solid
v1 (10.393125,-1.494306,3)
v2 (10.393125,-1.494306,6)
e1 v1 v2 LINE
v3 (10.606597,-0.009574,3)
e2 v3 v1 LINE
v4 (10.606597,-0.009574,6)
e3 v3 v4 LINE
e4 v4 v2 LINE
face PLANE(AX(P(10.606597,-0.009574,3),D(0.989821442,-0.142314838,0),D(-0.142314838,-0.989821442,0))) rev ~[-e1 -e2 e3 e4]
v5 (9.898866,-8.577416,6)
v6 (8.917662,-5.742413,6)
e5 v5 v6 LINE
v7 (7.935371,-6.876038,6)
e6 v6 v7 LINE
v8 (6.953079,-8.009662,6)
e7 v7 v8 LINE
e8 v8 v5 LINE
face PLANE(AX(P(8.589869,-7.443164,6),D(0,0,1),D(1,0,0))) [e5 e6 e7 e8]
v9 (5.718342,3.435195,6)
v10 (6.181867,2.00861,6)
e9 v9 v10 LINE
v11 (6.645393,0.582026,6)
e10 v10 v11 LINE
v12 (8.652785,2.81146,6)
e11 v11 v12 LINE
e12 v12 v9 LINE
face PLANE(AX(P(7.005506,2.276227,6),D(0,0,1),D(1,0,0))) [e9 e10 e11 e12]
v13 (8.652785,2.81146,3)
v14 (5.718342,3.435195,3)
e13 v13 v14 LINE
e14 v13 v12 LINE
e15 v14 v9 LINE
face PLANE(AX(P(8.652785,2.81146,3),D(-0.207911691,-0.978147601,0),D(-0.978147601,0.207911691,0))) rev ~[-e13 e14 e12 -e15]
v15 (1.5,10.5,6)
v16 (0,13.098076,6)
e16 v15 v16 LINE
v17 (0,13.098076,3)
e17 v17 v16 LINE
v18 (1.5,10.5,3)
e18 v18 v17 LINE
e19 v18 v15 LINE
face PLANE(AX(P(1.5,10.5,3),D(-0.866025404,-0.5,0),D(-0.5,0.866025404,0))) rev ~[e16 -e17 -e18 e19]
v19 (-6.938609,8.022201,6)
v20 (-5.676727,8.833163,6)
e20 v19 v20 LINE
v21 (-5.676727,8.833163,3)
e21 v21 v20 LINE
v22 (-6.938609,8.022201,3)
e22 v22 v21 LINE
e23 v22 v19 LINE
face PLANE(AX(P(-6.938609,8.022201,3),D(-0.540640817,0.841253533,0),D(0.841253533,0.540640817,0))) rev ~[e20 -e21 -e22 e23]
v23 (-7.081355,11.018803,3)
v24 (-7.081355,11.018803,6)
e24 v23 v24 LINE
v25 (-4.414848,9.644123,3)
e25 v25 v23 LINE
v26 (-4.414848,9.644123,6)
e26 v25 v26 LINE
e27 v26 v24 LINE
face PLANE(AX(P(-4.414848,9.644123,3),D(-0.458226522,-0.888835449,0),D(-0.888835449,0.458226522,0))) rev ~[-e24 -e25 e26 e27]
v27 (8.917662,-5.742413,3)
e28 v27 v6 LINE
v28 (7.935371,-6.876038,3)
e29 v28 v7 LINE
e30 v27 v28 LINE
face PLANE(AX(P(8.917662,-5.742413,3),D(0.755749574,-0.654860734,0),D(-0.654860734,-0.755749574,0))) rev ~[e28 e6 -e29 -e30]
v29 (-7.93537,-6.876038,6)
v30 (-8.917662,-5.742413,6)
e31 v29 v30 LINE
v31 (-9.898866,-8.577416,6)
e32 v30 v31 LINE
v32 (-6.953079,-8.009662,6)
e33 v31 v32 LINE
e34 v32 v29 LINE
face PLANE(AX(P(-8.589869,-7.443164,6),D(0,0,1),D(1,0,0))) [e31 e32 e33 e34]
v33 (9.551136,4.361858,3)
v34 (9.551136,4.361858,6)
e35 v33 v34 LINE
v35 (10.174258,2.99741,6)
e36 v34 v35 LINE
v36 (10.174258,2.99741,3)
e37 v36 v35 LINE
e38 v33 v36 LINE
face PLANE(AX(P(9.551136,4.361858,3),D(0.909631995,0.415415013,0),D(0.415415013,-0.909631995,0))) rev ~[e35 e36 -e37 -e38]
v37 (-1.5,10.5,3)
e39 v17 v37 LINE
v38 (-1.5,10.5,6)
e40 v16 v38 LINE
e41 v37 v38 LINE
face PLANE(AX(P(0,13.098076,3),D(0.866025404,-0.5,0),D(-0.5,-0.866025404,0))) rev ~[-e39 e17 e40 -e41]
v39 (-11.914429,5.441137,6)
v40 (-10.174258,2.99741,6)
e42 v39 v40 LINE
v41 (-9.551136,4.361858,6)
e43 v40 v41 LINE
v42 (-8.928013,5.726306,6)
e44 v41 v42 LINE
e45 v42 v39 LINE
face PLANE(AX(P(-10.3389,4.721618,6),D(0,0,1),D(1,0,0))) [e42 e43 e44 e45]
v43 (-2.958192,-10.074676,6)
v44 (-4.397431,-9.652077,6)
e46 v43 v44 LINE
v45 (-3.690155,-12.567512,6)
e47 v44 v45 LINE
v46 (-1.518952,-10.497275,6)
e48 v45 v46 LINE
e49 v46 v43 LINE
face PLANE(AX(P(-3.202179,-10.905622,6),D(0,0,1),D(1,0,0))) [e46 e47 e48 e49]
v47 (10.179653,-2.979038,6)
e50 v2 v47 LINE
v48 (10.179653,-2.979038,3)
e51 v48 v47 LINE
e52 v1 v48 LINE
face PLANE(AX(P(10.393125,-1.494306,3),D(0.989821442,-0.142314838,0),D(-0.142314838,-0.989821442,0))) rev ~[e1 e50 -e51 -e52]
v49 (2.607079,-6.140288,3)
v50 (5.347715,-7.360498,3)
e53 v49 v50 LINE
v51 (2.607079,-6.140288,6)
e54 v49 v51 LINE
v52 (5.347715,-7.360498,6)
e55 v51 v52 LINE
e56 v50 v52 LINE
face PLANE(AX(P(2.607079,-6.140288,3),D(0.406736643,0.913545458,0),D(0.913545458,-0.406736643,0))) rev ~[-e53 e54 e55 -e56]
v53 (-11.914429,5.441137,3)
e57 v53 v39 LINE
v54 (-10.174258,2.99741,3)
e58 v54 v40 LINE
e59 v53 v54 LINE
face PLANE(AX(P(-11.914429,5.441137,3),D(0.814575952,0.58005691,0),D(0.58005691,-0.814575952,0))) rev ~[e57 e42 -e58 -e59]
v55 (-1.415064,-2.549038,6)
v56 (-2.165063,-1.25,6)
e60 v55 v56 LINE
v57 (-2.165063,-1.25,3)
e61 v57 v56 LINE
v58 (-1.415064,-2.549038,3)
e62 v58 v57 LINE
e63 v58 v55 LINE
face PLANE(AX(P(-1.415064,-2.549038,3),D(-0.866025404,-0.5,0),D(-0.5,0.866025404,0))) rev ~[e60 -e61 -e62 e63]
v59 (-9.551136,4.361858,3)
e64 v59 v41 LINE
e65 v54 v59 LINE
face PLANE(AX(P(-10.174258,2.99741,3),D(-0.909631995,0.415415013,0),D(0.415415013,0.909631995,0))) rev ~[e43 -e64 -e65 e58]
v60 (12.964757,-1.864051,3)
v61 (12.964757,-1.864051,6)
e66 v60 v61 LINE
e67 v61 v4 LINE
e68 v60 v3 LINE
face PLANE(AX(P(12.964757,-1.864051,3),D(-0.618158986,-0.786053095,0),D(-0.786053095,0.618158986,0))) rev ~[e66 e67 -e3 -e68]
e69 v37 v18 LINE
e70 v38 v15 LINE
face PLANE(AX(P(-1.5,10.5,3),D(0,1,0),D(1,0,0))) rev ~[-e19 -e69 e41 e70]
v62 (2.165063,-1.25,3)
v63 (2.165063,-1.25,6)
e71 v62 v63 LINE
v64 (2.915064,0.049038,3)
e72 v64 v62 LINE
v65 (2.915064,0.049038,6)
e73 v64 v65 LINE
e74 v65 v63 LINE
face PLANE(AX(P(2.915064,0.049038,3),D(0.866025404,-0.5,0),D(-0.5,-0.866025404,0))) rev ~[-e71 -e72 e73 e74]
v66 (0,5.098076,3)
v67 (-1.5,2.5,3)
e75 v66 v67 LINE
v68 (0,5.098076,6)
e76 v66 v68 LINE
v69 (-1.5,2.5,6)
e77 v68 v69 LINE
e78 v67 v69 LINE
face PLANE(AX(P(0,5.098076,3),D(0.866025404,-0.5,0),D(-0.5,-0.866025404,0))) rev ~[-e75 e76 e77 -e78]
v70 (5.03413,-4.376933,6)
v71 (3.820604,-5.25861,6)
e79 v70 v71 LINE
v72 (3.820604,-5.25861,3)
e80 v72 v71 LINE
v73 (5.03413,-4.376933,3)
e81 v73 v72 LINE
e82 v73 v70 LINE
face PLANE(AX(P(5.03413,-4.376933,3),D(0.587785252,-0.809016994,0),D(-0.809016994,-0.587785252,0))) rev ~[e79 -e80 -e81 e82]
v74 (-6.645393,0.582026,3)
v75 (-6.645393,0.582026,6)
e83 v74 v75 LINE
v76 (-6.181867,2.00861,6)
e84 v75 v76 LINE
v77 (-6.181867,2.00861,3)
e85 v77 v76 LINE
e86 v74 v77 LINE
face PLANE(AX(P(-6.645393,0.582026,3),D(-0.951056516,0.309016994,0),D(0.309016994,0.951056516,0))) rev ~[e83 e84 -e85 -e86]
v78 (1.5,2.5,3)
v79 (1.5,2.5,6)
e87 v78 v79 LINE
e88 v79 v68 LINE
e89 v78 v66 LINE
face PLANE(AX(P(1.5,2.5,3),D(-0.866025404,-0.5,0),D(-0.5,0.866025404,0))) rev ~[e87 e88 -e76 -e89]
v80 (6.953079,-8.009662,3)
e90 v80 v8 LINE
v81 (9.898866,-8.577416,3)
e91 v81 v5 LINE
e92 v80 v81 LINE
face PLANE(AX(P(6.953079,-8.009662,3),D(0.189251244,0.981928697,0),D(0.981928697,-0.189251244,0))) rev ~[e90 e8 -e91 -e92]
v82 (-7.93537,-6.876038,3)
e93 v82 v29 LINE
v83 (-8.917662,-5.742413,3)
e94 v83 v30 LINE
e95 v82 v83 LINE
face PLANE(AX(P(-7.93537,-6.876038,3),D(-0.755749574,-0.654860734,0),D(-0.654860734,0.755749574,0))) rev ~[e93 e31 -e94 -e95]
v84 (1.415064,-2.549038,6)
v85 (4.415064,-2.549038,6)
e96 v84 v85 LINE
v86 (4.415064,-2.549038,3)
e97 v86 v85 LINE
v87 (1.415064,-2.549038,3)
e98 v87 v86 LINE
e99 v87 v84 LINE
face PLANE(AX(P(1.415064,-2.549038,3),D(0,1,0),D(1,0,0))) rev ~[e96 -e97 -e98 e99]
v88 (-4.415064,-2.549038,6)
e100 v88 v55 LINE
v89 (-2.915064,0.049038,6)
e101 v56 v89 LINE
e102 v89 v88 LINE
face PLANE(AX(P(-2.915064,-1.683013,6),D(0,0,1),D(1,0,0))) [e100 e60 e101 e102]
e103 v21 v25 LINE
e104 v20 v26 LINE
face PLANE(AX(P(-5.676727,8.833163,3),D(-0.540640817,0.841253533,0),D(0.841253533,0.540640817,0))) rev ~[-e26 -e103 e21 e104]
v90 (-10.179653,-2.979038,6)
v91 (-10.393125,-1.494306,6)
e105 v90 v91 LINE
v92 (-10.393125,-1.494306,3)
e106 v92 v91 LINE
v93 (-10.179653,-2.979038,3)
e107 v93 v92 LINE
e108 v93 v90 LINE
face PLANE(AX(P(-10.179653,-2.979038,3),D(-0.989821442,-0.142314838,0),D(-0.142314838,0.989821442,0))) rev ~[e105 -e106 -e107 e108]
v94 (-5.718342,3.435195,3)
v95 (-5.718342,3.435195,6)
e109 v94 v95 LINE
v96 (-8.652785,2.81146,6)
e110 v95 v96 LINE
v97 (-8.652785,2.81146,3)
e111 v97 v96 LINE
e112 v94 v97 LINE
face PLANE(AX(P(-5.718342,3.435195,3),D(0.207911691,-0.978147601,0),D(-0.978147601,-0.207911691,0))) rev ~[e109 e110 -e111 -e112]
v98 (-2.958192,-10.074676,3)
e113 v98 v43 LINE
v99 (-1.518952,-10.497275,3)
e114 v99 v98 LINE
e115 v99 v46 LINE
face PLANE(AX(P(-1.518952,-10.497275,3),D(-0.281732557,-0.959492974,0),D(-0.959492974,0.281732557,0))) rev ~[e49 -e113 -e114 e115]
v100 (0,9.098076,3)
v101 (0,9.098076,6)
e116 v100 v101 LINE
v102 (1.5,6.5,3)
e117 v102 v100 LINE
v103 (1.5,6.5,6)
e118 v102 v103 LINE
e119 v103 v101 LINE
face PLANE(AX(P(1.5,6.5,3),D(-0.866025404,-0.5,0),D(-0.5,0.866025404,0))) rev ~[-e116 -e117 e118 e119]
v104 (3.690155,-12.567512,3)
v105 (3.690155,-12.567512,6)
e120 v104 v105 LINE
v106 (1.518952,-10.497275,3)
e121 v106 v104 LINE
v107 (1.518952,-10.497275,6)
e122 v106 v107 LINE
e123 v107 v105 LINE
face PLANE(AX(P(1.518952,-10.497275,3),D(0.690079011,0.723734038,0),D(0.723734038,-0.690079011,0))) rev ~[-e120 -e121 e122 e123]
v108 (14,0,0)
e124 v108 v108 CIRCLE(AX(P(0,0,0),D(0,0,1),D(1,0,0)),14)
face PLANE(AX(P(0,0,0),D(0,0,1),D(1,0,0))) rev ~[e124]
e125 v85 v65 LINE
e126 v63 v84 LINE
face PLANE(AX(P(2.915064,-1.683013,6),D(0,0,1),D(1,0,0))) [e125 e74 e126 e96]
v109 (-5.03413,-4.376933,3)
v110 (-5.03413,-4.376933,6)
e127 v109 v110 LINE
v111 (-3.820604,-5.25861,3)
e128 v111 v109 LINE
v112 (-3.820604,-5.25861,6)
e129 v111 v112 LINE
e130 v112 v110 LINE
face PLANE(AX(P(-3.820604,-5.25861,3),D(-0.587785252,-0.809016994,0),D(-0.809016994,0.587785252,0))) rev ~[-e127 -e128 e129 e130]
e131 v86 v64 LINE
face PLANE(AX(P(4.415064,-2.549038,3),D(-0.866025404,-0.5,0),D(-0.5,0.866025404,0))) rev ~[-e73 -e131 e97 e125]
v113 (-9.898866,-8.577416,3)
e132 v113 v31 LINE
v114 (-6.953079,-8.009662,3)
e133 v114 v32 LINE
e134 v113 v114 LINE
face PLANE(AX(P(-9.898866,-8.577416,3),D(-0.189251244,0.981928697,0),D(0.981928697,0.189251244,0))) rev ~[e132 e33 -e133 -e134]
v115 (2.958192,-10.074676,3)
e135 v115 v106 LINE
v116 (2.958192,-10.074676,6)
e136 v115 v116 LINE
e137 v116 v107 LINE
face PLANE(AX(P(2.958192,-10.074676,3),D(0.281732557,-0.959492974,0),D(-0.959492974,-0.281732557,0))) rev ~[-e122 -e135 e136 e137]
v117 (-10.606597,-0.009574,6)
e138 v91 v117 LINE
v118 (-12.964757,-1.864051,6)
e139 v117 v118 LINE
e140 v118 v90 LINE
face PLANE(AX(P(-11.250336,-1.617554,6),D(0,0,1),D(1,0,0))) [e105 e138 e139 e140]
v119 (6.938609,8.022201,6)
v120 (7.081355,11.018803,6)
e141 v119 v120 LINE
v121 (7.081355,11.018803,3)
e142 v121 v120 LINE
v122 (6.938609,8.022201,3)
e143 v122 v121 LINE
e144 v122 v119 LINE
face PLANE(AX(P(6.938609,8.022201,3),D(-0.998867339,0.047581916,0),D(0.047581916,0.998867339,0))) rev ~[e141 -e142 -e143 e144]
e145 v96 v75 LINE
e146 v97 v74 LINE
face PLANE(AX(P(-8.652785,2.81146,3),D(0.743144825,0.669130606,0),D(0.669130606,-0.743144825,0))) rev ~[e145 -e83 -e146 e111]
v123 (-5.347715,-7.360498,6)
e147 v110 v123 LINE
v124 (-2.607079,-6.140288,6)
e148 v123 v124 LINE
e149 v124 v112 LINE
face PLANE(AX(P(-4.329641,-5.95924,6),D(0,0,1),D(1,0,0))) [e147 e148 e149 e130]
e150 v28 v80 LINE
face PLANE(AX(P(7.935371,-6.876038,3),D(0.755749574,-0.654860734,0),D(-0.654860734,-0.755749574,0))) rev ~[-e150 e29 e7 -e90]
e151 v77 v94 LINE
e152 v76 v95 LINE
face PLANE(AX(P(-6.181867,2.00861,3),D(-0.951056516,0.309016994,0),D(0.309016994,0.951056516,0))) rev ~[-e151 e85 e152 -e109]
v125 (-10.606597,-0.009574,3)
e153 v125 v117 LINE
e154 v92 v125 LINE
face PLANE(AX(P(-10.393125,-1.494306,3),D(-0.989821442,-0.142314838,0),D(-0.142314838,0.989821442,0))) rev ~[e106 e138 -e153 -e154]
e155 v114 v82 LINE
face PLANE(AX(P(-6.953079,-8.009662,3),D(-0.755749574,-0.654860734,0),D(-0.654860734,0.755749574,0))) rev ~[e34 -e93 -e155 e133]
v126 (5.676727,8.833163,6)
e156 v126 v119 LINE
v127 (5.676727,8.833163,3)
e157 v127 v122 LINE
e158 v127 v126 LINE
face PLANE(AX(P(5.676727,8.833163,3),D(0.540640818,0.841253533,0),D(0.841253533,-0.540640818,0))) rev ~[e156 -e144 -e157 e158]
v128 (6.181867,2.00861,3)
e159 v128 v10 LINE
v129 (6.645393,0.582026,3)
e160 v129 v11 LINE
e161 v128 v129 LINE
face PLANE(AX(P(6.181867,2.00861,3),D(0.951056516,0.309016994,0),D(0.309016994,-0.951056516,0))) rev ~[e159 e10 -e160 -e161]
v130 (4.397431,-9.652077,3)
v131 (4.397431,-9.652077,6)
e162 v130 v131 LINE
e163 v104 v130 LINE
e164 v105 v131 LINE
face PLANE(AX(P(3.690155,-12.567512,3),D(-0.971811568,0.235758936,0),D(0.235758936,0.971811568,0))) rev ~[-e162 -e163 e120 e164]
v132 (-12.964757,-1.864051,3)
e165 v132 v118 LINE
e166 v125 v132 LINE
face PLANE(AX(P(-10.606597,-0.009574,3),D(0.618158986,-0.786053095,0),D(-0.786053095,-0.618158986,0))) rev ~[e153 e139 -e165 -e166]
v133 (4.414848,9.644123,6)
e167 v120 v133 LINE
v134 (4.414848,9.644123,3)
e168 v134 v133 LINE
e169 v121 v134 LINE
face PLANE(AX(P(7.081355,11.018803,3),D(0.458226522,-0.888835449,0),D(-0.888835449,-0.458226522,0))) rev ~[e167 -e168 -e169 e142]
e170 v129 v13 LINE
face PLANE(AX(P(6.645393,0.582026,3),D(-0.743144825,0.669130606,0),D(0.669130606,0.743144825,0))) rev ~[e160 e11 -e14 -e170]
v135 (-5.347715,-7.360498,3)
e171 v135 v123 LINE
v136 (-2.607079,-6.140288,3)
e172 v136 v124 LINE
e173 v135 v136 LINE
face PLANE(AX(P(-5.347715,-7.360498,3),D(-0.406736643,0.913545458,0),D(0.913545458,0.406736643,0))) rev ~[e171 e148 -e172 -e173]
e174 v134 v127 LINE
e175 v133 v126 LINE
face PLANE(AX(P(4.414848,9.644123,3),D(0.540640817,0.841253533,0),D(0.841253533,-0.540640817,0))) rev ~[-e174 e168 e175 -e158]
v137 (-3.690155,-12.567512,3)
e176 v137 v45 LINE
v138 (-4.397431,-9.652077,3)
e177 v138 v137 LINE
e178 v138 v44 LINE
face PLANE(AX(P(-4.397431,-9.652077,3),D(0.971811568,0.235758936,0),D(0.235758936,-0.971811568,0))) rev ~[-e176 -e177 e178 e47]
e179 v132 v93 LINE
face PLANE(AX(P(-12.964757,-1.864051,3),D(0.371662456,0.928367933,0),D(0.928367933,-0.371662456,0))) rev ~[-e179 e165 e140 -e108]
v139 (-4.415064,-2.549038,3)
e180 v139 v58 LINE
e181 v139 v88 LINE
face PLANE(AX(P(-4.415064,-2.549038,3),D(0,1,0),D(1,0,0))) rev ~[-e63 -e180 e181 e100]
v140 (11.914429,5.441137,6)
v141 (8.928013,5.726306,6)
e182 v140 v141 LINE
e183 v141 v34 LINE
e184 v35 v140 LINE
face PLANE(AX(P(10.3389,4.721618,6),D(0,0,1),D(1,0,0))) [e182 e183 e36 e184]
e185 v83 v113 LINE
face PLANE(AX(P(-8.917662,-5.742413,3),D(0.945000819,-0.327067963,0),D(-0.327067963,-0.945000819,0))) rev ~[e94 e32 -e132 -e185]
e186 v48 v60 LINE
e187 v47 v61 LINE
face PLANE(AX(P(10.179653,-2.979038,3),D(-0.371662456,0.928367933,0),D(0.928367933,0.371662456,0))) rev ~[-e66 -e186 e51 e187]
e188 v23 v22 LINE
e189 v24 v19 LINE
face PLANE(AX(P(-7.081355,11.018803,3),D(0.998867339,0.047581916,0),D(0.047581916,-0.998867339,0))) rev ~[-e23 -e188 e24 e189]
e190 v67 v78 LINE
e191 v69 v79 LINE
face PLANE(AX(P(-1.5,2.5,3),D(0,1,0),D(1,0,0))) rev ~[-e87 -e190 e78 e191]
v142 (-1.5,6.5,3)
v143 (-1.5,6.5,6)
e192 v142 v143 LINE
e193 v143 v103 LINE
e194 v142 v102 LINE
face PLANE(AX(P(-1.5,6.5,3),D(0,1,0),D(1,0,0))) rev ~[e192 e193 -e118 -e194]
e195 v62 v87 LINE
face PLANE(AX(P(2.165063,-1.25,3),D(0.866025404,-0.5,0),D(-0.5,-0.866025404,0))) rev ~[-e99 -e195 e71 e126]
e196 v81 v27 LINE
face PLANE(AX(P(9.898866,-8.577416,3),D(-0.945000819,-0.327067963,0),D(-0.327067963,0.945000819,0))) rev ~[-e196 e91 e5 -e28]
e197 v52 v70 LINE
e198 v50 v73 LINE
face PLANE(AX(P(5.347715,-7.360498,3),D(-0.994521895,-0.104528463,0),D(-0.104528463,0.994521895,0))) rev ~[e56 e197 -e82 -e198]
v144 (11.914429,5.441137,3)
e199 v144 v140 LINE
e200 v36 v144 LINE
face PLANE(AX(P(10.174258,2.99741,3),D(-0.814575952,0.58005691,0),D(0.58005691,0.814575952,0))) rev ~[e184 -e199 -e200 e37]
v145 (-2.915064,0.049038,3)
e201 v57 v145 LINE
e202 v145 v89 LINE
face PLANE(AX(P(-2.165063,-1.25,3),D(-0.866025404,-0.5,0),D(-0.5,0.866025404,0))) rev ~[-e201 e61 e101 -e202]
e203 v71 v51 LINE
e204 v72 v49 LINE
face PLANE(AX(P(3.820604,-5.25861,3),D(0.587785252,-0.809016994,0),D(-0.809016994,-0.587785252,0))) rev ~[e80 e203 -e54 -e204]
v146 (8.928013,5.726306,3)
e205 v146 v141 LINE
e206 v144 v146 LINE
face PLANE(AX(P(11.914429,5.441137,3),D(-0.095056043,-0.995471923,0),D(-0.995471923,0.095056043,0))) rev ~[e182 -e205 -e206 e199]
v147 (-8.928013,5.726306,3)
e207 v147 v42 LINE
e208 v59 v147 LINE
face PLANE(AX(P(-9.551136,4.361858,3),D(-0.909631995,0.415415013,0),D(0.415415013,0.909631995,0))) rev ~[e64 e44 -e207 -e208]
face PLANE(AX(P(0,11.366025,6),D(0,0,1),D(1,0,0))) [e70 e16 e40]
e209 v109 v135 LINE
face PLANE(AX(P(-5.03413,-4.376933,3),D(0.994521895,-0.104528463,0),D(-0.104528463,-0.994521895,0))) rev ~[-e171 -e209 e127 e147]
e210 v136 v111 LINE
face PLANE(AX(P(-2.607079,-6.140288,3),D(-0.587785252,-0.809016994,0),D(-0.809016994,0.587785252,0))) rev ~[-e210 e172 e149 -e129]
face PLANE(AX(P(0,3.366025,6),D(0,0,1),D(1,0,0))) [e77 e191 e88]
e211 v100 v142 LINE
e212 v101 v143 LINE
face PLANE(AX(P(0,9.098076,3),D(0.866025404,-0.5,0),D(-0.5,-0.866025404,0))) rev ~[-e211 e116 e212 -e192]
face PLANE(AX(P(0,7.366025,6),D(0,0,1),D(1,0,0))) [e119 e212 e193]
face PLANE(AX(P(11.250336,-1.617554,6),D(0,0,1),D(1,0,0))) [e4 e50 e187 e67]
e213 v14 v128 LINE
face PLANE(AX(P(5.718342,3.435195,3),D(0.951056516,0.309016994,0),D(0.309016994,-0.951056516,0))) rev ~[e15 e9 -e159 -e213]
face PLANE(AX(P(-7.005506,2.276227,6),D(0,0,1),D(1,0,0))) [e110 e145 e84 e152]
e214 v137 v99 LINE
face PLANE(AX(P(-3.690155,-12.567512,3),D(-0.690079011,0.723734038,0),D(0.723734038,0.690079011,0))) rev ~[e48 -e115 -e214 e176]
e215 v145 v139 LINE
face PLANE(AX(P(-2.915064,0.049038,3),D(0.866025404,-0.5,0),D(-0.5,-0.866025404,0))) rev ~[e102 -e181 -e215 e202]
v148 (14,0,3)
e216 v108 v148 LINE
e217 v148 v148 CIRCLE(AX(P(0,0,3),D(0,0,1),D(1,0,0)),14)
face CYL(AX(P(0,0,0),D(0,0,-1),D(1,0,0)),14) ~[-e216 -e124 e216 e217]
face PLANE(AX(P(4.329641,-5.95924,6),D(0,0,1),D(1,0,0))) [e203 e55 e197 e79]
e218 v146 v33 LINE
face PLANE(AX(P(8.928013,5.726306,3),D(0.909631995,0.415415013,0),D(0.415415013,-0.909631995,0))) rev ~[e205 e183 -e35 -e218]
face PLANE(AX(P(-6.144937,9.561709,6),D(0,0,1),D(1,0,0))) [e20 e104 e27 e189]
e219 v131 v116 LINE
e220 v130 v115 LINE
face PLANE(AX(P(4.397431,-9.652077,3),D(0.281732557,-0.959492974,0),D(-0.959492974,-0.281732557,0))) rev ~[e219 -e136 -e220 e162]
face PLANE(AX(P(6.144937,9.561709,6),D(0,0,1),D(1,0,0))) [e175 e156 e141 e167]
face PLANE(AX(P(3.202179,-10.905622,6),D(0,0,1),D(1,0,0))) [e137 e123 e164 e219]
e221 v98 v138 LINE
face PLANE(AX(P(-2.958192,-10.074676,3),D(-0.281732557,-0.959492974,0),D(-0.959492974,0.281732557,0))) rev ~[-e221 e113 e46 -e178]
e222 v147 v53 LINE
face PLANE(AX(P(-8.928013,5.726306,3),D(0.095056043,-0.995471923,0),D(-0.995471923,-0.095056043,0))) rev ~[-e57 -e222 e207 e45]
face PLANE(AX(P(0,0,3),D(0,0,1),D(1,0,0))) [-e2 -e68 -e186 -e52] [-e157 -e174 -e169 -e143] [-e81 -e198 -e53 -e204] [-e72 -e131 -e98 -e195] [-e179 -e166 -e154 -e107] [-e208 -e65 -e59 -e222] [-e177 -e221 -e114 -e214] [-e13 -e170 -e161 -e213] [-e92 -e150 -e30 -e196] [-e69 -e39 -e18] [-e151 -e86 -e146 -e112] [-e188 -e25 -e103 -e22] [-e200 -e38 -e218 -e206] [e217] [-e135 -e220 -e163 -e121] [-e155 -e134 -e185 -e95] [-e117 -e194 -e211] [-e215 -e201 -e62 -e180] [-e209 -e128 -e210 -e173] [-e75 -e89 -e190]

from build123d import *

# Parameters (mm, degrees)
F0_R     = 14
F1_DEPTH = 3
F3_DEPTH = 3


# Not quite as in the source:
# - a feature names something its author has since deleted; it is built from what else it names


with BuildPart() as f1:
    # F0 (on Top) → F1 (new body)
    with BuildSketch(Plane.XY):
        Circle(F0_R)
    extrude(amount=F1_DEPTH)

    # F2 (on face) → F3 (join)
    with BuildSketch(Plane.XY.offset(3)):
        Polygon((0, 6.5), (1.5, 6.5), (0, 9.0980762114), (-1.5, 6.5), align=None)
        Polygon((-6.6453928475, 0.582025689), (-6.1818673809, 2.0086103865), (-5.7183418644, 3.4351952379), (-8.6527846666, 2.8114601654), align=None)
        Polygon((-2.6070786483, -6.1402883419), (-3.8206041381, -5.2586104647), (-5.0341296315, -4.376932585), (-5.3477150213, -7.3604982711), align=None)
        Polygon((-6.9386088825, 8.0222008685), (-5.6767273349, 8.833162897), (-4.414848284, 9.6441233209), (-7.08135463, 11.0188028861), align=None)
        Polygon((0, 10.5), (1.5, 10.5), (0, 13.0980762114), (-1.5, 10.5), align=None)
        Polygon((4.3974313073, -9.6520773877), (2.9581918265, -10.0746762289), (1.5189523864, -10.4972750582), (3.6901545007, -12.5675120927), align=None)
        Polygon((-1.5189523864, -10.4972750582), (-2.9581918467, -10.074676223), (-4.3974313073, -9.6520773877), (-3.6901545007, -12.5675120927), align=None)
        Polygon((-6.9530794298, -8.009662068), (-7.9353704205, -6.8760378337), (-8.9176616316, -5.7424133449), (-9.8988655216, -8.577415801), align=None)
        Polygon((-10.1796528823, -2.9790379647), (-10.3931251437, -1.4943057747), (-10.6065973972, -0.009573639), (-12.9647566814, -1.8640505977), align=None)
        Polygon((0, 2.5), (1.5, 2.5), (0, 5.0980762114), (-1.5, 2.5), align=None)
        Polygon((-1.4150635095, -2.5490381057), (-2.1650632679, -1.2500004183), (-2.9150635095, 0.0490381057), (-4.4150635095, -2.5490381057), align=None)
        Polygon((2.9150635095, 0.0490381057), (2.1650632692, -1.2500004162), (1.4150635095, -2.5490381057), (4.4150635095, -2.5490381057), align=None)
        Polygon((8.9280134317, 5.7263056296), (9.5511359728, 4.3618575893), (10.1742584707, 2.9974096435), (11.9144291994, 5.4411374996), align=None)
        Polygon((5.7183418644, 3.4351952379), (6.1818673459, 2.0086104943), (6.6453928475, 0.582025689), (8.6527846666, 2.8114601654), align=None)
        Polygon((5.0341296315, -4.376932585), (3.8206041381, -5.2586104647), (2.6070786483, -6.1402883419), (5.3477150213, -7.3604982711), align=None)
        Polygon((8.9176616316, -5.7424133449), (7.9353705512, -6.8760376828), (6.9530794298, -8.009662068), (9.8988655216, -8.577415801), align=None)
        Polygon((10.6065973972, -0.009573639), (10.3931251437, -1.4943057747), (10.1796528823, -2.9790379647), (12.9647566814, -1.8640505977), align=None)
        Polygon((-10.1742584707, 2.9974096435), (-9.551135936, 4.3618576698), (-8.9280134317, 5.7263056296), (-11.9144291994, 5.4411374996), align=None)
        Polygon((4.414848284, 9.6441233209), (5.6767273496, 8.8331628876), (6.9386088825, 8.0222008685), (7.08135463, 11.0188028861), align=None)
    extrude(amount=F3_DEPTH)


solid = f1.part
